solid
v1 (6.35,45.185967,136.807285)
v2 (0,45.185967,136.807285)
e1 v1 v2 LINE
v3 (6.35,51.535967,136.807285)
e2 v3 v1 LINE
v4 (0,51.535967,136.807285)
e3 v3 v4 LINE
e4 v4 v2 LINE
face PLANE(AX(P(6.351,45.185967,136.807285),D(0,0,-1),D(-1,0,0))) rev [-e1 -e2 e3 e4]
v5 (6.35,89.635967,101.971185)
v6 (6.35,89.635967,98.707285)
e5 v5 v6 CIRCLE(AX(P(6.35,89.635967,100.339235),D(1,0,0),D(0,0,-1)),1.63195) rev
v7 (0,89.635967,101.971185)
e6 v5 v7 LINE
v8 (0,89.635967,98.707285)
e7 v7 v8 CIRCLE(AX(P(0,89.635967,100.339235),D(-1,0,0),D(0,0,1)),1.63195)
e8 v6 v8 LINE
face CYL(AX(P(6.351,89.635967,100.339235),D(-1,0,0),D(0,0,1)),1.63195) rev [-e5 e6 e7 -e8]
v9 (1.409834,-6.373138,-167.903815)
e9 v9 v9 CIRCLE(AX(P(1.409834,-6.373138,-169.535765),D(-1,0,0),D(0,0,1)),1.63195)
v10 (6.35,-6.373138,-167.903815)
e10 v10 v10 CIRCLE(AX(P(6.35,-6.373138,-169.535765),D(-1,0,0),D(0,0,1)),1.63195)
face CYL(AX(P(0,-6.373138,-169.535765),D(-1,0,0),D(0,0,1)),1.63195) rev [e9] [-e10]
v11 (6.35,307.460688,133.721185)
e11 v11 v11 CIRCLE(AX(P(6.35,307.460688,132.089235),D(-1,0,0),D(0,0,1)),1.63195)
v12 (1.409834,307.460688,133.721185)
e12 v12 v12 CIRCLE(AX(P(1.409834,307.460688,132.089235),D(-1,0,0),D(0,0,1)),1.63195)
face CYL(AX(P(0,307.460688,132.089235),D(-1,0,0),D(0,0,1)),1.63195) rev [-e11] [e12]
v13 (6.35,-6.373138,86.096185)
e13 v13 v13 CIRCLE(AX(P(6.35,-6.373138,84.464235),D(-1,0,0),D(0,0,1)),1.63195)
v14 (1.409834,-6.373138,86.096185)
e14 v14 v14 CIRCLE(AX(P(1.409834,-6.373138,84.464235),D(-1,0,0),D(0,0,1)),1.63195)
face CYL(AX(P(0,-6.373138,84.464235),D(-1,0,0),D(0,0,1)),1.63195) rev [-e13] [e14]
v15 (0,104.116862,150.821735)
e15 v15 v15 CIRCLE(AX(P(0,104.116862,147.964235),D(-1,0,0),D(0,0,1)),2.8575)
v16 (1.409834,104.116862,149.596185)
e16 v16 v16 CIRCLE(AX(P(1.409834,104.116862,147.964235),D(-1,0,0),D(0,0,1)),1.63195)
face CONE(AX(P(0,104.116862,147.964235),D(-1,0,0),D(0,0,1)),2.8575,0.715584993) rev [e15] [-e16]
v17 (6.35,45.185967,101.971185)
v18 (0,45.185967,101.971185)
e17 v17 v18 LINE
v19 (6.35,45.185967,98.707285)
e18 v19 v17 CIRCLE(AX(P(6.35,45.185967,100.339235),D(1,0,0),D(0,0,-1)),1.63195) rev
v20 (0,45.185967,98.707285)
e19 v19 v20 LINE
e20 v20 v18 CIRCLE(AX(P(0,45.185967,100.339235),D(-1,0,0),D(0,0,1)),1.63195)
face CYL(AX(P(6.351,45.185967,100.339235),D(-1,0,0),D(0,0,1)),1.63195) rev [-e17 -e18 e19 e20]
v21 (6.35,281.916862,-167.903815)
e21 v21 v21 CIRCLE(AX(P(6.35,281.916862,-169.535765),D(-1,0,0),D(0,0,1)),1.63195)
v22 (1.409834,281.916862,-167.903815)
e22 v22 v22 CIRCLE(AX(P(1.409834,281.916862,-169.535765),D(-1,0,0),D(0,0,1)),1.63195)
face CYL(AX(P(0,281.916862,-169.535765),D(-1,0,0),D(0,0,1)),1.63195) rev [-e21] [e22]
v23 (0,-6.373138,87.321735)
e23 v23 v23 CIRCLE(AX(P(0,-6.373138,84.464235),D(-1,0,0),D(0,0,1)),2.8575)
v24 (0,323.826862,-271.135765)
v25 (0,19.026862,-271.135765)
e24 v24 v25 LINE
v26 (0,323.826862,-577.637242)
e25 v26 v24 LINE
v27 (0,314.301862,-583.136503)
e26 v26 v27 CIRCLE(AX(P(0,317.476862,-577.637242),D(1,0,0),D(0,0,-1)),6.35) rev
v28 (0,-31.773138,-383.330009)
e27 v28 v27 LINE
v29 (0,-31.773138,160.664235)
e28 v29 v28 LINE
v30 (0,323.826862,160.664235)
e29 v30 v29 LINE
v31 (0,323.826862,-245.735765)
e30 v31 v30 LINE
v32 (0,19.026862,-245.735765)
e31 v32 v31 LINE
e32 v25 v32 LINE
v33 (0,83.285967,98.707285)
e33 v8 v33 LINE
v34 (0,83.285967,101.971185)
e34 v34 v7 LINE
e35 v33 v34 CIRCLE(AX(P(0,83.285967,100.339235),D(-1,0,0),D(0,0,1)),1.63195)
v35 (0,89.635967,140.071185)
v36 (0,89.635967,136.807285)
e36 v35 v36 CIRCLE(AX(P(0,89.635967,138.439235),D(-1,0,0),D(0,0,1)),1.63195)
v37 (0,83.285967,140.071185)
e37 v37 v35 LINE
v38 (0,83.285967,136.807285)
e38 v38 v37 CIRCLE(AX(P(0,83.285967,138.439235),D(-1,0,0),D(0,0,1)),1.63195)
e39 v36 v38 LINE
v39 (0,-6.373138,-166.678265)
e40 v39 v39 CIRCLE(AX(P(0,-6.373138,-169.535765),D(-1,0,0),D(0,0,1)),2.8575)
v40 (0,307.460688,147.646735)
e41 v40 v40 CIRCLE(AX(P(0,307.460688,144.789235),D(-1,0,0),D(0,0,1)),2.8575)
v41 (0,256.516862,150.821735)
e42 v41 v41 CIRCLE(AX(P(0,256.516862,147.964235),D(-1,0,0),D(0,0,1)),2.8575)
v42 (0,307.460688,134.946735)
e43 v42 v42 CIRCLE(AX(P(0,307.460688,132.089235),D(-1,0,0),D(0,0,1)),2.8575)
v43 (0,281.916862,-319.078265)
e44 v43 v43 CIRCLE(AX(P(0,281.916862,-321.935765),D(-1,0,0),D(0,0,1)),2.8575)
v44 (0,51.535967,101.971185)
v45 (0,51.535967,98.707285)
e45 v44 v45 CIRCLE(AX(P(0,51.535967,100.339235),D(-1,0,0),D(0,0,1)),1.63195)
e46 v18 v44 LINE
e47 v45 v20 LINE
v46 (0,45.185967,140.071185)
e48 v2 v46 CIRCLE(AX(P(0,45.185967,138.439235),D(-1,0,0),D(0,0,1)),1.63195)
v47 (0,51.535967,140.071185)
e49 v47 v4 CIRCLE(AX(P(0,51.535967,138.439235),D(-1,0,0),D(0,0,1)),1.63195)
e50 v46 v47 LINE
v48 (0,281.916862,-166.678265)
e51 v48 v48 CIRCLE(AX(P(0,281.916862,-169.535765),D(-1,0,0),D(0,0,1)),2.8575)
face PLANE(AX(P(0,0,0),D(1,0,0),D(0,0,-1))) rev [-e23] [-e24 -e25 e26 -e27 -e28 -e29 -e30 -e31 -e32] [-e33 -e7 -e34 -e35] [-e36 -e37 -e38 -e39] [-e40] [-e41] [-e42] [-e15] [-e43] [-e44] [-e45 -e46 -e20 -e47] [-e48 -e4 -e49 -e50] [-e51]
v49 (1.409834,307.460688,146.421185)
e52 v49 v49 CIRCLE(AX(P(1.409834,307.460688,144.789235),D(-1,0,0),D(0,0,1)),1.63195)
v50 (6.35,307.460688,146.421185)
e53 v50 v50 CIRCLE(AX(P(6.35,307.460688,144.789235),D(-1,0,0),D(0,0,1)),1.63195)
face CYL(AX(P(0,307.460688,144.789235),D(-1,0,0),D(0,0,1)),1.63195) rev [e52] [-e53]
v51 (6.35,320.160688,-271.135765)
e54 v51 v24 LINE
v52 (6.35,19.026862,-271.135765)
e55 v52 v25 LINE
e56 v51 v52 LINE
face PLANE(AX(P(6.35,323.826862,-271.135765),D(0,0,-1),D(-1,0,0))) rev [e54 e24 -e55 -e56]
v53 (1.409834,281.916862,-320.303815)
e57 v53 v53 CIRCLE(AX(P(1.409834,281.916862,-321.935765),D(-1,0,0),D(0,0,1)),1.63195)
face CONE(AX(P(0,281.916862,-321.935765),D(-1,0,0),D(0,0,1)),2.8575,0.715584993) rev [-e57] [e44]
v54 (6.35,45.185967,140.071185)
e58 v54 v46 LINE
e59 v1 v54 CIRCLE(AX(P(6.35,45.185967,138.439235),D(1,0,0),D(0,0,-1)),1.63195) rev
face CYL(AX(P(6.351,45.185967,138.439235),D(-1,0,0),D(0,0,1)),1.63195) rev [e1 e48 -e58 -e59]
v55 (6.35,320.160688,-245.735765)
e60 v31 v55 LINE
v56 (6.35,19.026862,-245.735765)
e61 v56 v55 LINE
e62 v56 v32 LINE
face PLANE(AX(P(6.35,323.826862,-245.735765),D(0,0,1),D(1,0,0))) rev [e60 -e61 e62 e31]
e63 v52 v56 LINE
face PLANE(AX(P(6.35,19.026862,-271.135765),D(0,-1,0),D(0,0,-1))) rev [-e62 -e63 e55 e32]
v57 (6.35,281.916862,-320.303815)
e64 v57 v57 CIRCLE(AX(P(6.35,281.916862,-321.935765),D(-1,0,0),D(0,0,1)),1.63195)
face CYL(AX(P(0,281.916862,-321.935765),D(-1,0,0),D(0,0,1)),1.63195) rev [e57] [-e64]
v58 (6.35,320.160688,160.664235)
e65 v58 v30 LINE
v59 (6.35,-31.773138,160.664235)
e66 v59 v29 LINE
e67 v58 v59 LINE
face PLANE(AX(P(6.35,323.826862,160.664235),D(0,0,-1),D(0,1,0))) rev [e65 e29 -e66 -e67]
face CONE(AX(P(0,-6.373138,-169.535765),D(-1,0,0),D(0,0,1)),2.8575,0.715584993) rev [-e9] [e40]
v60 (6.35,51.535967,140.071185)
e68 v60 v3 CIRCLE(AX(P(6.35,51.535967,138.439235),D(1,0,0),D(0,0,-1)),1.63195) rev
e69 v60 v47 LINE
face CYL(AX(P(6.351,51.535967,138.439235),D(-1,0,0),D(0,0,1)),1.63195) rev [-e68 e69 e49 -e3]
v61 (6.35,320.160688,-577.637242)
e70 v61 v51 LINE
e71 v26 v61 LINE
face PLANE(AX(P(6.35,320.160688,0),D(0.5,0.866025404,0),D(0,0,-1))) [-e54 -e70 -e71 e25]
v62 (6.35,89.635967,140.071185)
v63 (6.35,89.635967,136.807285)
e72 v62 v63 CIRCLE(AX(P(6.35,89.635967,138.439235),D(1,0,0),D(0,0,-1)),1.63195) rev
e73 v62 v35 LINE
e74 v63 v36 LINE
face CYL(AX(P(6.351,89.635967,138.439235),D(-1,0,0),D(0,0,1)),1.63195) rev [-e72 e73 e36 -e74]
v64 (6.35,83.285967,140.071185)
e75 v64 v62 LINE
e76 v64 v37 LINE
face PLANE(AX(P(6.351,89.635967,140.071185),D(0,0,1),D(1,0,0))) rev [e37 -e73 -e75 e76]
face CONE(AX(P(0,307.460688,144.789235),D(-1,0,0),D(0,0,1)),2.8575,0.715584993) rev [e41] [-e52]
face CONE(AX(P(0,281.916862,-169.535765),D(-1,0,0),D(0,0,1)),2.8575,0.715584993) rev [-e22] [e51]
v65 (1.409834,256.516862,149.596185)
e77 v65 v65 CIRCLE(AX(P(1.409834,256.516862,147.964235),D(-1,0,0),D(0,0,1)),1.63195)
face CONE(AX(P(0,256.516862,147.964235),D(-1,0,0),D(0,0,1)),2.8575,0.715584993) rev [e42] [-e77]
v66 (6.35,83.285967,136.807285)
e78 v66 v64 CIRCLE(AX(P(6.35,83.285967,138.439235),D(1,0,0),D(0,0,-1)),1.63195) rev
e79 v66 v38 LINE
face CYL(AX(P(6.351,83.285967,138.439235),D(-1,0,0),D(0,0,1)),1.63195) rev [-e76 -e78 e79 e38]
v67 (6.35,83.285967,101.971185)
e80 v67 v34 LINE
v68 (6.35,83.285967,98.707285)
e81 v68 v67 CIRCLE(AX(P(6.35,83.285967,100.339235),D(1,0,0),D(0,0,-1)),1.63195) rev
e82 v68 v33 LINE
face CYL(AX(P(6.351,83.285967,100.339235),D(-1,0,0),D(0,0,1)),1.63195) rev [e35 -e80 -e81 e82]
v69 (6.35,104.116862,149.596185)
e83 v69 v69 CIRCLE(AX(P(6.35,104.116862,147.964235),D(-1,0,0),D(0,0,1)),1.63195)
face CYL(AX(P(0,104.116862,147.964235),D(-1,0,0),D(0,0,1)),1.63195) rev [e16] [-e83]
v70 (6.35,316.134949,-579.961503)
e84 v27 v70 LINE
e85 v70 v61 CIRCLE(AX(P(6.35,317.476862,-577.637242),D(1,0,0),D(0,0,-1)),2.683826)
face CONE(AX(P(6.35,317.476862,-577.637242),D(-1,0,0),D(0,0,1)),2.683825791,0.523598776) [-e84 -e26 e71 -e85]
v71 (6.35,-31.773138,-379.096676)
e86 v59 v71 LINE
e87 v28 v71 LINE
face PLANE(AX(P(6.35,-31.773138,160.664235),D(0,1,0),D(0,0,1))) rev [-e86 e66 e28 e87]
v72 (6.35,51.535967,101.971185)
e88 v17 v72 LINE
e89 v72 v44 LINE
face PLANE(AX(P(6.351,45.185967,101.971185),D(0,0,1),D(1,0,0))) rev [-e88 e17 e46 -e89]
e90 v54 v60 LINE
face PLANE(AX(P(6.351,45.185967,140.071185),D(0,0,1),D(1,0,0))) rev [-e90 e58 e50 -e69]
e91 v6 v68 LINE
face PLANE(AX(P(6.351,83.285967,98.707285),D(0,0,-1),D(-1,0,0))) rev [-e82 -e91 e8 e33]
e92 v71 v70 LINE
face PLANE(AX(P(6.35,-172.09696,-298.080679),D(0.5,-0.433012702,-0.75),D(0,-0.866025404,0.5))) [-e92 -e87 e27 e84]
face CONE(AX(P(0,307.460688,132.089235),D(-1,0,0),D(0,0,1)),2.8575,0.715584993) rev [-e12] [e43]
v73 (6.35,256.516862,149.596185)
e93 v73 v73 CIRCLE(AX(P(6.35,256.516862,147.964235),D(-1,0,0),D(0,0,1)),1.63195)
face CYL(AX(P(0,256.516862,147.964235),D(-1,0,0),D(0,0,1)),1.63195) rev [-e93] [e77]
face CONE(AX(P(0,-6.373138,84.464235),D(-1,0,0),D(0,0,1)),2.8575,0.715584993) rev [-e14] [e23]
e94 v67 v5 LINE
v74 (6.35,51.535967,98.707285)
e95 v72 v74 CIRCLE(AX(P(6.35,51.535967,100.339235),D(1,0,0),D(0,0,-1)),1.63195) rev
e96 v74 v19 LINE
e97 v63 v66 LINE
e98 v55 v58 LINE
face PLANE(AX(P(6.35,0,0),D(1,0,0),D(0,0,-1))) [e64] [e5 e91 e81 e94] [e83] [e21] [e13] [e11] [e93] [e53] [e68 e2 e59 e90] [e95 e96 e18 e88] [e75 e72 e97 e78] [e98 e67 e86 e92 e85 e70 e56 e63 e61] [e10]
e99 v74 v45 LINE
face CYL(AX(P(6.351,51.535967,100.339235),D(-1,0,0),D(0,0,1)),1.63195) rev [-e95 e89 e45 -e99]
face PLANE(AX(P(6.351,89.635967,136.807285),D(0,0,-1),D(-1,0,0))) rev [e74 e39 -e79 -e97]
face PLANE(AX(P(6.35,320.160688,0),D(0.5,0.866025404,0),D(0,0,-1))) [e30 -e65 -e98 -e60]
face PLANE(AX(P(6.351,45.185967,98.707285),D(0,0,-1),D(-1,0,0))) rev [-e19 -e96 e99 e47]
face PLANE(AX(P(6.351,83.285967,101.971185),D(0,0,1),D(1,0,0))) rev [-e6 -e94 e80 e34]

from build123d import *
from OCP.BRepFilletAPI import BRepFilletAPI_MakeChamfer

# Parameters (mm, degrees)
BOSS_EXTRUDE1_DEPTH                            = 6.35
SKETCH2_W                                      = 25.4
SKETCH2_H                                      = 304.8
CUT_EXTRUDE1_DEPTH                             = 672.86027017
FILLET1_R                                      = 6.35
CHAMFER3_SIZE                                  = 3.666174209
CHAMFER3_SIZE_2                                = 6.35
CSK_FOR_4_FLAT_HEAD_MACHINE_SCREW1_D           = 3.2639
CSK_FOR_4_FLAT_HEAD_MACHINE_SCREW1_CSINK_D     = 5.715
CSK_FOR_4_FLAT_HEAD_MACHINE_SCREW1_CSINK_ANGLE = 82
CUT_EXTRUDE2_REACH                             = 669.791
CSK_FOR_4_FLAT_HEAD_MACHINE_SCREW2_D           = 3.2639
CSK_FOR_4_FLAT_HEAD_MACHINE_SCREW2_CSINK_D     = 5.715
CSK_FOR_4_FLAT_HEAD_MACHINE_SCREW2_CSINK_ANGLE = 82


with BuildPart() as part:
    # Sketch1 → Boss-Extrude1 (new body)
    with BuildSketch(Plane(origin=(0, 0, 0), x_dir=(0, 0, -1), z_dir=(1, 0, 0))):
        Polygon((588.635764647, 323.826862244), (383.330008924, -31.773137756), (-160.664235353, -31.773137756), (-160.664235353, 323.826862244), align=None)
    extrude(amount=BOSS_EXTRUDE1_DEPTH)

    # Sketch2 → Cut-Extrude1 (cut, through all)
    with BuildSketch(Plane.ZY):
        with Locations((-258.435764647, 171.426862244)):
            Rectangle(SKETCH2_W, SKETCH2_H)
    extrude(amount=-CUT_EXTRUDE1_DEPTH, mode=Mode.SUBTRACT)

    # Fillet1
    fillet1_edges = [part.edges().sort_by_distance(p)[0] for p in [
        (3.175, 323.826862244, -588.635764647),
    ]]
    fillet(fillet1_edges, radius=FILLET1_R)

    # Chamfer3
    chamfer3_edges_1 = [part.edges().sort_by_distance(p)[0] for p in [
        (6.35, 323.826862244, -42.535764647),
    ]]
    chamfer3_side_1 = [part.faces().sort_by_distance(p)[0] for p in [
        (6.35, 323.753538759, -42.535764647),
    ]]
    chamfer3_edges_2 = [part.edges().sort_by_distance(p)[0] for p in [
        (6.35, 141.264362244, -483.233256128),
    ]]
    chamfer3_side_2 = [part.faces().sort_by_distance(p)[0] for p in [
        (6.276676516, 141.264362244, -483.233256128),
    ]]
    chamfer3_edges_3 = [part.edges().sort_by_distance(p)[0] for p in [
        (6.35, 320.651862244, -583.136503333),
    ]]
    chamfer3_side_3 = [part.faces().sort_by_distance(p)[0] for p in [
        (6.276676516, 320.651862244, -583.136503333),
    ]]
    chamfer3_edges_4 = [part.edges().sort_by_distance(p)[0] for p in [
        (6.35, 323.826862244, -424.386503333),
    ]]
    chamfer3_side_4 = [part.faces().sort_by_distance(p)[0] for p in [
        (6.35, 323.753538759, -424.386503333),
    ]]
    chamfer3 = BRepFilletAPI_MakeChamfer(part.part.solid().wrapped)
    for e in chamfer3_edges_1:
        chamfer3.Add(CHAMFER3_SIZE - 0.0001, CHAMFER3_SIZE_2 - 0.0001, e.wrapped, chamfer3_side_1[0].wrapped)
    for e in chamfer3_edges_2:
        chamfer3.Add(CHAMFER3_SIZE_2 - 0.0001, CHAMFER3_SIZE - 0.0001, e.wrapped, chamfer3_side_2[0].wrapped)
    for e in chamfer3_edges_3:
        chamfer3.Add(CHAMFER3_SIZE_2 - 0.0001, CHAMFER3_SIZE - 0.0001, e.wrapped, chamfer3_side_3[0].wrapped)
    for e in chamfer3_edges_4:
        chamfer3.Add(CHAMFER3_SIZE - 0.0001, CHAMFER3_SIZE_2 - 0.0001, e.wrapped, chamfer3_side_4[0].wrapped)
    add(Compound.cast(chamfer3.Shape()), mode=Mode.REPLACE)  # a hair under: the kernel refuses the full size

    # CSK for #4 Flat Head Machine Screw1 (through all)
    with Locations(Plane(origin=(0, 256.516862244, 147.964235353), x_dir=(0, 0, -1), z_dir=(-1, 0, 0))):
        with Locations((0, 0), (317.5, -25.4), (469.9, -25.4), (0, 152.4), (63.5, 262.89), (317.5, 262.89)):
            CounterSinkHole(CSK_FOR_4_FLAT_HEAD_MACHINE_SCREW1_D / 2, CSK_FOR_4_FLAT_HEAD_MACHINE_SCREW1_CSINK_D / 2, counter_sink_angle=CSK_FOR_4_FLAT_HEAD_MACHINE_SCREW1_CSINK_ANGLE)

    # Sketch7 → Cut-Extrude2 (cut, up to next)
    with BuildSketch(Plane.ZY, mode=Mode.PRIVATE) as cut_extrude2_sk1:
        with BuildLine():
            Line((140.071185353, 89.635966927), (140.071185353, 83.285966927))
            ThreePointArc((140.071185353, 83.285966927), (138.439235353, 81.654016927), (136.807285353, 83.285966927))
            Line((136.807285353, 83.285966927), (136.807285353, 89.635966927))
            ThreePointArc((136.807285353, 89.635966927), (138.439235353, 91.267916927), (140.071185353, 89.635966927))
        make_face()
    cut_extrude2_tool1 = extrude(cut_extrude2_sk1.sketch, amount=-CUT_EXTRUDE2_REACH, mode=Mode.PRIVATE) & part.part
    # Sketch7 → Cut-Extrude2 (cut, up to next)
    with BuildSketch(Plane.ZY, mode=Mode.PRIVATE) as cut_extrude2_sk2:
        with BuildLine():
            Line((98.707285353, 83.285966927), (98.707285353, 89.635966927))
            ThreePointArc((98.707285353, 89.635966927), (100.339235353, 91.267916927), (101.971185353, 89.635966927))
            Line((101.971185353, 89.635966927), (101.971185353, 83.285966927))
            ThreePointArc((101.971185353, 83.285966927), (100.339235353, 81.654016927), (98.707285353, 83.285966927))
        make_face()
    cut_extrude2_tool2 = extrude(cut_extrude2_sk2.sketch, amount=-CUT_EXTRUDE2_REACH, mode=Mode.PRIVATE) & part.part
    # Sketch7 → Cut-Extrude2 (cut, up to next)
    with BuildSketch(Plane.ZY, mode=Mode.PRIVATE) as cut_extrude2_sk3:
        with BuildLine():
            Line((98.707285353, 45.185966927), (98.707285353, 51.535966927))
            ThreePointArc((98.707285353, 51.535966927), (100.339235353, 53.167916927), (101.971185353, 51.535966927))
            Line((101.971185353, 51.535966927), (101.971185353, 45.185966927))
            ThreePointArc((101.971185353, 45.185966927), (100.339235353, 43.554016927), (98.707285353, 45.185966927))
        make_face()
    cut_extrude2_tool3 = extrude(cut_extrude2_sk3.sketch, amount=-CUT_EXTRUDE2_REACH, mode=Mode.PRIVATE) & part.part
    # Sketch7 → Cut-Extrude2 (cut, up to next)
    with BuildSketch(Plane.ZY, mode=Mode.PRIVATE) as cut_extrude2_sk4:
        with BuildLine():
            Line((136.807285353, 45.185966927), (136.807285353, 51.535966927))
            ThreePointArc((136.807285353, 51.535966927), (138.439235353, 53.167916927), (140.071185353, 51.535966927))
            Line((140.071185353, 51.535966927), (140.071185353, 45.185966927))
            ThreePointArc((140.071185353, 45.185966927), (138.439235353, 43.554016927), (136.807285353, 45.185966927))
        make_face()
    cut_extrude2_tool4 = extrude(cut_extrude2_sk4.sketch, amount=-CUT_EXTRUDE2_REACH, mode=Mode.PRIVATE) & part.part
    add(cut_extrude2_tool1.solids().sort_by_distance((0, 86.460967, 138.439235))[0], mode=Mode.SUBTRACT)
    add(cut_extrude2_tool2.solids().sort_by_distance((0, 86.460967, 100.339235))[0], mode=Mode.SUBTRACT)
    add(cut_extrude2_tool3.solids().sort_by_distance((0, 48.360967, 100.339235))[0], mode=Mode.SUBTRACT)
    add(cut_extrude2_tool4.solids().sort_by_distance((0, 48.360967, 138.439235))[0], mode=Mode.SUBTRACT)

    # CSK for #4 Flat Head Machine Screw2 (through all)
    with Locations(Plane.ZY):
        with Locations((132.089235353, 307.460688034), (144.789235353, 307.460688034)):
            CounterSinkHole(CSK_FOR_4_FLAT_HEAD_MACHINE_SCREW2_D / 2, CSK_FOR_4_FLAT_HEAD_MACHINE_SCREW2_CSINK_D / 2, counter_sink_angle=CSK_FOR_4_FLAT_HEAD_MACHINE_SCREW2_CSINK_ANGLE)


solid = part.part
